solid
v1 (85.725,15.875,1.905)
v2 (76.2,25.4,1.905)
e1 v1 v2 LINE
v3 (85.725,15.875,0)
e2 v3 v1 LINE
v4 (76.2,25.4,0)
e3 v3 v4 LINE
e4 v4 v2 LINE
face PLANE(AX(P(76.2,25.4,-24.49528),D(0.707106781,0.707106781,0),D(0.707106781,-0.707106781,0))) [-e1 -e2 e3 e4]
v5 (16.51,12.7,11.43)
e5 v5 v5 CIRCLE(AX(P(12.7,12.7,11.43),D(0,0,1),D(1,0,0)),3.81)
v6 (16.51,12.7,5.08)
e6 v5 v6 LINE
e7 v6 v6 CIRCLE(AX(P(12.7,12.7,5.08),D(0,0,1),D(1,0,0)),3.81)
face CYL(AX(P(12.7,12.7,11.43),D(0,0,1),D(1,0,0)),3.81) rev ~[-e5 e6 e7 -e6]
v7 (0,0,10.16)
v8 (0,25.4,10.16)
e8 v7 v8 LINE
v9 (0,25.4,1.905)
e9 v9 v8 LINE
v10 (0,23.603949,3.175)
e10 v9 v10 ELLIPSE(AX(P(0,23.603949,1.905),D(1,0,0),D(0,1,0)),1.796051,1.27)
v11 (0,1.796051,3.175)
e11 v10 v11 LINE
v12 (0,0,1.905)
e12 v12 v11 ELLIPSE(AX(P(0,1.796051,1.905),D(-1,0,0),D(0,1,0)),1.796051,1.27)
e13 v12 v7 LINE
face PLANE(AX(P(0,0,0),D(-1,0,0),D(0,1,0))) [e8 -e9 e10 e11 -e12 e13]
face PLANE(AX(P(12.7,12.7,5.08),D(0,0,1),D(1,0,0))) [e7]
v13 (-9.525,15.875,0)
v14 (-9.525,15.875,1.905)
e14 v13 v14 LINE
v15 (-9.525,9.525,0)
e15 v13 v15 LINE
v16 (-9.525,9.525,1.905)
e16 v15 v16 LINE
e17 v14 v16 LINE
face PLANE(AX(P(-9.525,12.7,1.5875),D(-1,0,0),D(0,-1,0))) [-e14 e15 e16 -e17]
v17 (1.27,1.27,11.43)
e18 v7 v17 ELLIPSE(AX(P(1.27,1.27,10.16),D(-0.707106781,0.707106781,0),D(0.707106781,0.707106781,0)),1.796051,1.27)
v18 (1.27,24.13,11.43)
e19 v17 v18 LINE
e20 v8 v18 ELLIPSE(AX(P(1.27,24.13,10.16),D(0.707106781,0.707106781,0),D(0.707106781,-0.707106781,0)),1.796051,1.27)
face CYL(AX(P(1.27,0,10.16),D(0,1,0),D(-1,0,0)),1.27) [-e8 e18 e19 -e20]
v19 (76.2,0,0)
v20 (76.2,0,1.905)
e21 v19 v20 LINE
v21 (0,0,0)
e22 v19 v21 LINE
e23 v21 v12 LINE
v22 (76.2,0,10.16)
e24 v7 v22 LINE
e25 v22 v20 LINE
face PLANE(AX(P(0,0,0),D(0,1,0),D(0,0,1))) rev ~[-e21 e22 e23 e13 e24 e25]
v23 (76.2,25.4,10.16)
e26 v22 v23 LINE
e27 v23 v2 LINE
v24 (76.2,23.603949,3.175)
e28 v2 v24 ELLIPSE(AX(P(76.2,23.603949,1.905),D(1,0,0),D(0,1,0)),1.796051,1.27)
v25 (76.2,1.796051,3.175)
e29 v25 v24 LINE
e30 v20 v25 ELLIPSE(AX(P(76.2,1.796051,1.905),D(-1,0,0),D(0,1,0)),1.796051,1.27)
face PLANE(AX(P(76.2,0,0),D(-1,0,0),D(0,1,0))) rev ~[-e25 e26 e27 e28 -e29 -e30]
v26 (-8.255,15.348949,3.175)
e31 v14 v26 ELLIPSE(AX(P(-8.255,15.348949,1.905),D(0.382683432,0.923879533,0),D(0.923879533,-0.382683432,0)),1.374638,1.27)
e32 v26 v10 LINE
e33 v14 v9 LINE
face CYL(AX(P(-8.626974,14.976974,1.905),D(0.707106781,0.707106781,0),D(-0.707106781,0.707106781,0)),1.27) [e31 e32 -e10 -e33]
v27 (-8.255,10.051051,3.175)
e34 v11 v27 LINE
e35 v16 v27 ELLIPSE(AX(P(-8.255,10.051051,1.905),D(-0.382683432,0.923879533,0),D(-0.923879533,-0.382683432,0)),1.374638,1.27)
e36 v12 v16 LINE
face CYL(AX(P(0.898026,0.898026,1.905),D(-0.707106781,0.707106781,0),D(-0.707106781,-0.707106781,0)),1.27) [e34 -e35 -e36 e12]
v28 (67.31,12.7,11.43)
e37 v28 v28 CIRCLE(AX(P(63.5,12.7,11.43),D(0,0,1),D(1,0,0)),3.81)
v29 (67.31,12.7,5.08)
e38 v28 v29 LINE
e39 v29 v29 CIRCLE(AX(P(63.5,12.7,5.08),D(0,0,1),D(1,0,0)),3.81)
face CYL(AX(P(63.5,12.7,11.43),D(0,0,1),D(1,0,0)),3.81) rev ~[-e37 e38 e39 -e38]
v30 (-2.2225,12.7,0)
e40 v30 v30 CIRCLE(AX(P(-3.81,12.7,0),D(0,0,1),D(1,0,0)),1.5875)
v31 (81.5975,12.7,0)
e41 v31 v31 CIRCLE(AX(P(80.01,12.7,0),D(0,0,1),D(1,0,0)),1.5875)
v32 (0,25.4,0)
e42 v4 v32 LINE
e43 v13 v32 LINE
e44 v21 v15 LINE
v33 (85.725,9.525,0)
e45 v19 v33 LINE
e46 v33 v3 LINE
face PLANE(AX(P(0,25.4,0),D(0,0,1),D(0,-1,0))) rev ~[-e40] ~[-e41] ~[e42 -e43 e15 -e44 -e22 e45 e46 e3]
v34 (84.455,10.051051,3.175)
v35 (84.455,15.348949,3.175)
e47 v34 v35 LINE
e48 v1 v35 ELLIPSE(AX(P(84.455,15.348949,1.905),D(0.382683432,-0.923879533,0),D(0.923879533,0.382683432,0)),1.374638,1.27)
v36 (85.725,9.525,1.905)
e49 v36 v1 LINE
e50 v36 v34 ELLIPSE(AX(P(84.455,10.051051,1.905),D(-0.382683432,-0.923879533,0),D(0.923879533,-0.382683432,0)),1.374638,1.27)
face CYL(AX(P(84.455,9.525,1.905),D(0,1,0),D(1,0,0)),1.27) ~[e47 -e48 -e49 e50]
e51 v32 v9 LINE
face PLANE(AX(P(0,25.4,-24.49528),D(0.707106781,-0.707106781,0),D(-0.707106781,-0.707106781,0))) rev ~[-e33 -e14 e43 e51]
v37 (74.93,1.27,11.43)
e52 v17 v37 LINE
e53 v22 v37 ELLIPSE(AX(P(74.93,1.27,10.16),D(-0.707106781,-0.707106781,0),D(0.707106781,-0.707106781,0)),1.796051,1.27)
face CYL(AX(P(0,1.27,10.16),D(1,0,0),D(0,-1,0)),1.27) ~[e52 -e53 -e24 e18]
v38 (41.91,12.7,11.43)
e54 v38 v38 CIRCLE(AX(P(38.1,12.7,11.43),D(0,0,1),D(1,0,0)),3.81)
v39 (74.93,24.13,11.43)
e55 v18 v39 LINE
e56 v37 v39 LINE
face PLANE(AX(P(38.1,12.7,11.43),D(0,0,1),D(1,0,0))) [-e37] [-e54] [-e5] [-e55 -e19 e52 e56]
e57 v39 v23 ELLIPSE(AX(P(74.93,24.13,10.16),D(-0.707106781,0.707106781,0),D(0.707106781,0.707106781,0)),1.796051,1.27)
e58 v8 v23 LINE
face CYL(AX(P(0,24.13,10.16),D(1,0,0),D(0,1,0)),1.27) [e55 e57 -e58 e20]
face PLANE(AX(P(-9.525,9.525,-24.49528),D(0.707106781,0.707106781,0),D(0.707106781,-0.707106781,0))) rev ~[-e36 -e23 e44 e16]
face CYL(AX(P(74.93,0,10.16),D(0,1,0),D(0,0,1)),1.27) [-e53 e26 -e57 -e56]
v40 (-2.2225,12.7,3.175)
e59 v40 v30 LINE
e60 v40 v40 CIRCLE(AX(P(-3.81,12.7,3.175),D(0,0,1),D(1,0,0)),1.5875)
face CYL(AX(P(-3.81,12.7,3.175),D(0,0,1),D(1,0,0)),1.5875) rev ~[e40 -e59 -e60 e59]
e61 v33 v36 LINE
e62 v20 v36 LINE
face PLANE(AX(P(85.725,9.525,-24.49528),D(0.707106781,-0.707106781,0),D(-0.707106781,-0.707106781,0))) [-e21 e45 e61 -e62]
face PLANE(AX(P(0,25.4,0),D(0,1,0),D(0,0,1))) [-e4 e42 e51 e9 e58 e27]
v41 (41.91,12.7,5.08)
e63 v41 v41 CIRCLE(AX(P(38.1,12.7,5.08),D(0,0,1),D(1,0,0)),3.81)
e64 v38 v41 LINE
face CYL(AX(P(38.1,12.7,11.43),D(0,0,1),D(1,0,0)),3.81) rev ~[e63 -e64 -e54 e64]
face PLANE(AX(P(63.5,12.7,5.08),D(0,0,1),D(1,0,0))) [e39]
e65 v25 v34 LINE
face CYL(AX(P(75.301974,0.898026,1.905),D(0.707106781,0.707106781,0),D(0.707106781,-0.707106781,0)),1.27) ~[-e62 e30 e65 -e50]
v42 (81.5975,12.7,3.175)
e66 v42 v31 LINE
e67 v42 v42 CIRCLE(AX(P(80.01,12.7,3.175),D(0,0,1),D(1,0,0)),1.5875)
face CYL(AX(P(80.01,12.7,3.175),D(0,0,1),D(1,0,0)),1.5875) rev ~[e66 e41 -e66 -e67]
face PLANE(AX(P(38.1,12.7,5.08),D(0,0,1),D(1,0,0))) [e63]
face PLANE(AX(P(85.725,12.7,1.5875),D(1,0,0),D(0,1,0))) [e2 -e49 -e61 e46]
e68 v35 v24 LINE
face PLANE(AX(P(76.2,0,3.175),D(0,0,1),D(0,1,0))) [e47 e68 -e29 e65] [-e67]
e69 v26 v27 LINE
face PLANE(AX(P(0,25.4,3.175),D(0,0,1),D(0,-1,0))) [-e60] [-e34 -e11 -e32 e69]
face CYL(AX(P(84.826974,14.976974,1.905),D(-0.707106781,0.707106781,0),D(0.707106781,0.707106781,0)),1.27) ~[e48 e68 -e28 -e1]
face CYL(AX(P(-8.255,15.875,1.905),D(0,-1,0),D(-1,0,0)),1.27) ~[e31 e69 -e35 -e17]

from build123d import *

# Parameters (mm, degrees)
F0_W        = 76.2
F0_H        = 25.4
F1_DEPTH    = 11.43
F2_R        = 3.81
F3_DEPTH    = 6.35
F4_R        = 1.27
F5_W        = 25.4
F5_H        = 3.175
F6_DEPTH    = 9.525
F7_W        = 25.4
F7_H        = 3.175
F8_DEPTH    = 9.525
F9_T1_DEPTH = 52.1655609208
F10_R       = 1.27
F11_R       = 1.5875
F12_DEPTH   = 25.4
F13_R       = 1.5875
F14_DEPTH   = 25.4


# Not quite as in the source:
# - a fillet or chamfer that OpenCascade refuses, or shapes differently, is made with other operations: its cross-section is extruded or revolved along the edge and cut away or added


with BuildPart() as f1:
    # F0 (on Top) → F1 (new body)
    with BuildSketch(Plane.XY):
        with Locations((38.1, 12.7)):
            Rectangle(F0_W, F0_H)
    extrude(amount=F1_DEPTH)

    # F2 (on face) → F3 (cut)
    with BuildSketch(Plane.XY.offset(11.43)):
        with Locations((12.7, 12.7)):
            Circle(F2_R)
        with Locations((38.1, 12.7)):
            Circle(F2_R)
        with Locations((63.5, 12.7)):
            Circle(F2_R)
    extrude(amount=-F3_DEPTH, mode=Mode.SUBTRACT)

    # F4
    f4_edges = [f1.edges().sort_by_distance(p)[0] for p in [
        (38.1, 0, 11.43),
        (76.2, 12.7, 11.43),
        (38.1, 25.4, 11.43),
        (0, 12.7, 11.43),
    ]]
    fillet(f4_edges, radius=F4_R)

    # F5 (on face) → F6 (join)
    with BuildSketch(Plane.YZ.offset(76.2)):
        with Locations((12.7, 1.5875)):
            Rectangle(F5_W, F5_H)
    extrude(amount=F6_DEPTH)

    # F7 (on face) → F8 (join)
    with BuildSketch(Plane(origin=(0, 0, 0), x_dir=(0, -1, 0), z_dir=(-1, 0, 0))):
        with Locations((-12.7, 1.5875)):
            Rectangle(F7_W, F7_H)
    extrude(amount=F8_DEPTH)

    # F9: chamfer of 9.525 on 6 edges, made by hand

    # F9_s2 → F9_t1 (cut)
    with BuildSketch(Plane.XY.offset(-24.4952804604)):
        Polygon((0, 25.4), (-9.525, 15.875), (-9.525, 25.4), align=None)
        Polygon((76.2, 25.4), (85.725, 15.875), (85.725, 25.4), align=None)
        Polygon((85.725, 9.525), (76.2, 0), (85.725, 0), align=None)
        Polygon((-9.525, 9.525), (0, 0), (-9.525, 0), align=None)
    extrude(amount=F9_T1_DEPTH, mode=Mode.SUBTRACT)

    # F10
    f10_edges = [f1.edges().sort_by_distance(p)[0] for p in [
        (-4.7625, 4.7625, 3.175),
        (-9.525, 12.7, 3.175),
        (-4.7625, 20.6375, 3.175),
        (80.9625, 4.7625, 3.175),
        (85.725, 12.7, 3.175),
        (80.9625, 20.6375, 3.175),
    ]]
    fillet(f10_edges, radius=F10_R)

    # F11 (on face) → F12 (cut)
    with BuildSketch(Plane.XY.offset(3.175)):
        with Locations((-3.81, 12.7)):
            Circle(F11_R)
    extrude(amount=-F12_DEPTH, mode=Mode.SUBTRACT)

    # F13 (on face) → F14 (cut)
    with BuildSketch(Plane.XY.offset(3.175)):
        with Locations((80.01, 12.7)):
            Circle(F13_R)
    extrude(amount=-F14_DEPTH, mode=Mode.SUBTRACT)


solid = f1.part
